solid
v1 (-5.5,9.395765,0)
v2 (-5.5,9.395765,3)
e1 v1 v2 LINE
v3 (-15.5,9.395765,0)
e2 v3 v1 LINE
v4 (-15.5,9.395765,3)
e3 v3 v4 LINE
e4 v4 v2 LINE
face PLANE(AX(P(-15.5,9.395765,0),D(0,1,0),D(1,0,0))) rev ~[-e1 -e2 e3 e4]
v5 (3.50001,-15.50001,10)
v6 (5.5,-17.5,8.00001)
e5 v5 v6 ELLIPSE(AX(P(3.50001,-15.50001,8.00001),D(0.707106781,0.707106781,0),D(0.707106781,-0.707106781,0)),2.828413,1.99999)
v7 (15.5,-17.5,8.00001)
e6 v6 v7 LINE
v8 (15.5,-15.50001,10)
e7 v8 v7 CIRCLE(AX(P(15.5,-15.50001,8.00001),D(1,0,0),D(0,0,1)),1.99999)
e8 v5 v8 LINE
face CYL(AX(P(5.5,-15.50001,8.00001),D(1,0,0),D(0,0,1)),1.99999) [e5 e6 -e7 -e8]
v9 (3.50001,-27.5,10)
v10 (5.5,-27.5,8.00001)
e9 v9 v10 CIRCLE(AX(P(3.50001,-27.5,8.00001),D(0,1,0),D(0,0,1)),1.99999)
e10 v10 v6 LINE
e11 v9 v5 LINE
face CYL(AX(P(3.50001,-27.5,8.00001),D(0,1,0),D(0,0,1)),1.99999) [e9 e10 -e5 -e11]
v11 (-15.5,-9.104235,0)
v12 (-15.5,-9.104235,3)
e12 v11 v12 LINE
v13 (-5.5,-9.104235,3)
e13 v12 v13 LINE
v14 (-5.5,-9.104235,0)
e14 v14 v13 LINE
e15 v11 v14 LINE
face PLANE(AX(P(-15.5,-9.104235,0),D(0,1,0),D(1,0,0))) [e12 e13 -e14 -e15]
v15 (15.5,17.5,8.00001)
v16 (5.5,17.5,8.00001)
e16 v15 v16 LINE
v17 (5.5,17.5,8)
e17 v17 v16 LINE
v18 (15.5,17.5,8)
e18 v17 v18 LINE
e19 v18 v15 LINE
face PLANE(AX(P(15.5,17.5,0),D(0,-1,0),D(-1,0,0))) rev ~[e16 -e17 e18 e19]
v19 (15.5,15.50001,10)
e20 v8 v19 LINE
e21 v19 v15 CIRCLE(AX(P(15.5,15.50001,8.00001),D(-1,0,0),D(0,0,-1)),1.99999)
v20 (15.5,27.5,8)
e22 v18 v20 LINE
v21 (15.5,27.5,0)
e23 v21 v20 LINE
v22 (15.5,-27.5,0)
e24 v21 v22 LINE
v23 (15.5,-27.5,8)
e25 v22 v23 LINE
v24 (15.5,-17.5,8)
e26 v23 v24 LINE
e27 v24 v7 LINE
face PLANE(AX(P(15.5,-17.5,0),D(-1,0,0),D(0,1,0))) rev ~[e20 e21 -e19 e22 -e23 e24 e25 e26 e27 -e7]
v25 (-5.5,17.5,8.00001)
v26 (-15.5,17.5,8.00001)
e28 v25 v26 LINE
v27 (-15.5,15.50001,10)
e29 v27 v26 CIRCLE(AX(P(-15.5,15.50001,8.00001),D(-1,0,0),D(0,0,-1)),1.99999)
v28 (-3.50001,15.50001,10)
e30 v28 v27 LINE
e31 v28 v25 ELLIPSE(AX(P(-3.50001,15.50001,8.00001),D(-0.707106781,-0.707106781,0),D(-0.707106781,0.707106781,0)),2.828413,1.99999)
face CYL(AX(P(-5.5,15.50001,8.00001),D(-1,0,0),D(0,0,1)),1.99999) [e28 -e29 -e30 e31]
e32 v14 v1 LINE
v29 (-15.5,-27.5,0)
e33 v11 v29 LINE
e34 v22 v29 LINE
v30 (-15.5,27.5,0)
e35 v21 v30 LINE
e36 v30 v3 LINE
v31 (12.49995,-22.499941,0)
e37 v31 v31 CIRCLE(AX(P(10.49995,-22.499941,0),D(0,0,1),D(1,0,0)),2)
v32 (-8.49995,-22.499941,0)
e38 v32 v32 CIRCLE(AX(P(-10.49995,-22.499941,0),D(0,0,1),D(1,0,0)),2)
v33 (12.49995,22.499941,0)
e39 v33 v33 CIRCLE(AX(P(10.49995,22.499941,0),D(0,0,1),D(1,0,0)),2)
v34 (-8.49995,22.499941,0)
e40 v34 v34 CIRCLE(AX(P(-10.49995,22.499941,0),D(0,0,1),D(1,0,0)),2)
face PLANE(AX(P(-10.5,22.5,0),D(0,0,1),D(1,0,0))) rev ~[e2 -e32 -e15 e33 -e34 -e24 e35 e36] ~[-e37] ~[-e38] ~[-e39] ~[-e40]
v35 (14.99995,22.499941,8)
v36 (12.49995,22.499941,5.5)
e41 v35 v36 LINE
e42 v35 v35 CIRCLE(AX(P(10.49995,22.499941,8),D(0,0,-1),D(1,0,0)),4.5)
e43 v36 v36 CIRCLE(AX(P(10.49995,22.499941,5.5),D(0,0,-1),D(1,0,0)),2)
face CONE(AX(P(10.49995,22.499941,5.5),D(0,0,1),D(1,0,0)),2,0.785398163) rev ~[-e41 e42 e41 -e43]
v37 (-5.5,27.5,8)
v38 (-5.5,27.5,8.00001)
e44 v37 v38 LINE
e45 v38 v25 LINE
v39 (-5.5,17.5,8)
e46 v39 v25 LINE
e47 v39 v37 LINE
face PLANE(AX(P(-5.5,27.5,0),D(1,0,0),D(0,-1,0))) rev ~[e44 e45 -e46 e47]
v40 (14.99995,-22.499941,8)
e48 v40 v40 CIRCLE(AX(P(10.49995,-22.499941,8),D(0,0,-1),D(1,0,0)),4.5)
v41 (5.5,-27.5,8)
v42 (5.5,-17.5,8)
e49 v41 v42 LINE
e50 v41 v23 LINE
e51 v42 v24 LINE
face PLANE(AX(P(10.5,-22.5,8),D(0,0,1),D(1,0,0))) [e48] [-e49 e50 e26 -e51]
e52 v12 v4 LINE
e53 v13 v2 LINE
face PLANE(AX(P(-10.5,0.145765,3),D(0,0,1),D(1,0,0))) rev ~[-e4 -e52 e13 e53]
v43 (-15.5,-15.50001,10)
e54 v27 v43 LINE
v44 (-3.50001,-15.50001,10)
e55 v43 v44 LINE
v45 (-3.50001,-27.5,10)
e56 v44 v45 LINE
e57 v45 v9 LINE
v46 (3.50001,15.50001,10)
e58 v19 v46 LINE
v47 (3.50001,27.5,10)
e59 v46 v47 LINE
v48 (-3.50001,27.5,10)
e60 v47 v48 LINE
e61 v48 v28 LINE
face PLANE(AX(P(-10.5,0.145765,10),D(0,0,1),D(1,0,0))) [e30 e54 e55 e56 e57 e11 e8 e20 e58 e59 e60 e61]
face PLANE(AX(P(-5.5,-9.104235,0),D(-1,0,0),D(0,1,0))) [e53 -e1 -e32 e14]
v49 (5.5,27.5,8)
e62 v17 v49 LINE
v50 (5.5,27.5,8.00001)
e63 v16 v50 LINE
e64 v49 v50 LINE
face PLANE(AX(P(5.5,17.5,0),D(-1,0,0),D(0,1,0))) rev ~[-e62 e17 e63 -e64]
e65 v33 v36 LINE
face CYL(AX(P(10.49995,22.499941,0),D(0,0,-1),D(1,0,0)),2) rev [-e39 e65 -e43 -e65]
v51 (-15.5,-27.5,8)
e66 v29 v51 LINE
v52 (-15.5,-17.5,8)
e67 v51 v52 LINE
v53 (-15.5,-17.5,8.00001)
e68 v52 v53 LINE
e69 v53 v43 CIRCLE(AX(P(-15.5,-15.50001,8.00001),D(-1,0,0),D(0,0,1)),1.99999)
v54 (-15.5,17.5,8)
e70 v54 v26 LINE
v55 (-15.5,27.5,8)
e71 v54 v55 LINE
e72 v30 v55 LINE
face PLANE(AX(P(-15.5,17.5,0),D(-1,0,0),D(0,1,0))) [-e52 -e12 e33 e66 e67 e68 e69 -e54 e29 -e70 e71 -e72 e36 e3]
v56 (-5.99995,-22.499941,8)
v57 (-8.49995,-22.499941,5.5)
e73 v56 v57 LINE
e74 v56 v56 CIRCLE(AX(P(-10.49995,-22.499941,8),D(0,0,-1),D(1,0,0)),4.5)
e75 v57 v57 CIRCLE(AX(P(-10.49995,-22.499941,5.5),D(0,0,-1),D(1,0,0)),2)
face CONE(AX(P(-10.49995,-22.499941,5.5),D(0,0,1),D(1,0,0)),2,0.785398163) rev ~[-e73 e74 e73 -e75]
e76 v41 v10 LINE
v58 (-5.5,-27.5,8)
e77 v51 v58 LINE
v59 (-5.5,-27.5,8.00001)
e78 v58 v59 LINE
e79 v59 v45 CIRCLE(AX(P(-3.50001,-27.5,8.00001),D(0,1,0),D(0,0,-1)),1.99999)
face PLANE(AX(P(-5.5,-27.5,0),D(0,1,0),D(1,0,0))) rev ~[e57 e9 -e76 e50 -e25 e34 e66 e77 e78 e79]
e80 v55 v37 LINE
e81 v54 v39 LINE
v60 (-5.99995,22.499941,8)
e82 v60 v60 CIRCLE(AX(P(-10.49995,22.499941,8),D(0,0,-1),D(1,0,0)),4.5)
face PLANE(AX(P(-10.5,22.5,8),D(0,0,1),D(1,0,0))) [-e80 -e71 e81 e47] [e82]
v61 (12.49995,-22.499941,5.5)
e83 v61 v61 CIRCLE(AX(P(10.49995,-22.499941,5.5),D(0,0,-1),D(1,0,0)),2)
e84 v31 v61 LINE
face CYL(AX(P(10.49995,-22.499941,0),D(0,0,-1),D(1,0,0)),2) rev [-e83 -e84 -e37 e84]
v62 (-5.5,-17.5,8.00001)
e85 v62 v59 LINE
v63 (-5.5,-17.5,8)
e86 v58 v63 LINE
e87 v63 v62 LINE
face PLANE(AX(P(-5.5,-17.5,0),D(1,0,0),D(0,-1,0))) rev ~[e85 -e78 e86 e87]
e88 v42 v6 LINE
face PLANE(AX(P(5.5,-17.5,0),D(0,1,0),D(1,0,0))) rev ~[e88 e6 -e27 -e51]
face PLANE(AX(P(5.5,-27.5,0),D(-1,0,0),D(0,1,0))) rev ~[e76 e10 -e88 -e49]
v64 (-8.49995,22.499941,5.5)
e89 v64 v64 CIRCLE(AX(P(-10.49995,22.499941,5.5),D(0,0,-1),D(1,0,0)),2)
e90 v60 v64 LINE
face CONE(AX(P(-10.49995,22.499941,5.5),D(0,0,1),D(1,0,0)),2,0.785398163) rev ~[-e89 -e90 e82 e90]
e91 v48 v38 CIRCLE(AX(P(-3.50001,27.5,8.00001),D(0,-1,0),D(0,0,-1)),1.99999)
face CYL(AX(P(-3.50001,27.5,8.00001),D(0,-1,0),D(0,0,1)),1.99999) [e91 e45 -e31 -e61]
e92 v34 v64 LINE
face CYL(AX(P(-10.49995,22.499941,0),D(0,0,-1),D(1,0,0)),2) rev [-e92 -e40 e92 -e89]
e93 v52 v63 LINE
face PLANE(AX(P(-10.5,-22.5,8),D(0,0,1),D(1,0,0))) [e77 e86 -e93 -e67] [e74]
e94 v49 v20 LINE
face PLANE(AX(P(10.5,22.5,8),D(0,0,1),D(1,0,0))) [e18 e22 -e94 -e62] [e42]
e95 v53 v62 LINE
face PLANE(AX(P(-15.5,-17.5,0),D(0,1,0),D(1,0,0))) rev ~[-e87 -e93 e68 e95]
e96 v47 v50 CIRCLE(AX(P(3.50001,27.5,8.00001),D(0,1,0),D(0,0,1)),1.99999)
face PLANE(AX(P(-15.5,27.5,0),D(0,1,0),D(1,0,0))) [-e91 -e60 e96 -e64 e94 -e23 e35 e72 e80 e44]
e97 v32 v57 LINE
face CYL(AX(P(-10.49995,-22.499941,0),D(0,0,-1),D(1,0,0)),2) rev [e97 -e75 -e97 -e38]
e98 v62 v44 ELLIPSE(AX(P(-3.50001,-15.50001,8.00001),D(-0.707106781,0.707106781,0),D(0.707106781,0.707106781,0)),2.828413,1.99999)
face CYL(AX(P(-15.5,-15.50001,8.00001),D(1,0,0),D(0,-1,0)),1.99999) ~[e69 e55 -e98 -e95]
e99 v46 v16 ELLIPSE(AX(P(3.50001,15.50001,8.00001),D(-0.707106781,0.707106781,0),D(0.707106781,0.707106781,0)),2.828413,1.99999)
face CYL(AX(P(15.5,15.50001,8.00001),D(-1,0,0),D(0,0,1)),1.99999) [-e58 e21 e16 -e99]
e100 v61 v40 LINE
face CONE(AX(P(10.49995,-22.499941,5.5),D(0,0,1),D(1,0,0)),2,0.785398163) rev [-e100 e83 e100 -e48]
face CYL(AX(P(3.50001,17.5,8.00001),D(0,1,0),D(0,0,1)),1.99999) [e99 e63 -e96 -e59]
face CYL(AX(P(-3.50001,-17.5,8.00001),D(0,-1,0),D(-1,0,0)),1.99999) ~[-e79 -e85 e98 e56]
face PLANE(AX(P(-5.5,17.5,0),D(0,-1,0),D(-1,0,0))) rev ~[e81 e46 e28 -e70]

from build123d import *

# Parameters (mm, degrees)
F0_W     = 10
F0_H     = 18.5
F2_DEPTH = 10
F3_DEPTH = 3
F0_H_2   = 10
F4_DEPTH = 8
F1_R     = 2
F5_DEPTH = 25
F6_SIZE  = 2.5
F7_R     = 1.99999


# Not quite as in the source:
# - a fillet or chamfer is up to 0.001 mm smaller than in the source, because OpenCascade refuses the exact size


with BuildPart() as f2:
    # F0 (on Top) → F2 (new body)
    with BuildSketch(Plane.XY):
        with Locations((-10.5, 0.1457649022)):
            Rectangle(F0_W, F0_H)
        Polygon((5.5, 17.5), (5.5, 27.5), (-5.5, 27.5), (-5.5, 17.5), (-15.5, 17.5), (-15.5, 9.3957649022), (-5.5, 9.3957649022), (-5.5, -9.1042350978), (-15.5, -9.1042350978), (-15.5, -17.5), (-5.5, -17.5), (-5.5, -27.5), (5.5, -27.5), (5.5, -17.5), (15.5, -17.5), (15.5, 17.5), align=None)
    extrude(amount=F2_DEPTH)

    # F0 (on Top) → F3 (cut)
    with BuildSketch(Plane.XY):
        with Locations((-10.5, 0.1457649022)):
            Rectangle(F0_W, F0_H)
    extrude(amount=F3_DEPTH, mode=Mode.SUBTRACT)

    # F0 (on Top) → F4 (join)
    with BuildSketch(Plane.XY):
        with Locations((-10.5, 22.5)):
            Rectangle(F0_W, F0_H_2)
        with Locations((10.5, 22.5)):
            Rectangle(F0_W, F0_H_2)
        with Locations((-10.5, -22.5)):
            Rectangle(F0_W, F0_H_2)
        with Locations((10.5, -22.5)):
            Rectangle(F0_W, F0_H_2)
    extrude(amount=F4_DEPTH)

    # F1 (on Top) → F5 (cut)
    with BuildSketch(Plane.XY):
        with Locations((-10.4999503866, 22.4999412894)):
            Circle(F1_R)
        with Locations((10.4999503866, 22.4999412894)):
            Circle(F1_R)
        with Locations((-10.4999503866, -22.4999412894)):
            Circle(F1_R)
        with Locations((10.4999503866, -22.4999412894)):
            Circle(F1_R)
    extrude(amount=F5_DEPTH, mode=Mode.SUBTRACT)

    # F6
    f6_edges = [f2.edges().sort_by_distance(p)[0] for p in [
        (-12.49995, 22.499941, 8),
        (8.49995, 22.499941, 8),
        (8.49995, -22.499941, 8),
        (-12.49995, -22.499941, 8),
    ]]
    chamfer(f6_edges, length=F6_SIZE)

    # F7 (radius 2 in the source; OpenCascade refuses exactly that, so slightly less here)
    f7_edges = [f2.edges().sort_by_distance(p)[0] for p in [
        (-10.5, -17.5, 10),
        (-5.5, -22.5, 10),
        (-10.5, 17.5, 10),
        (-5.5, 22.5, 10),
        (5.5, 22.5, 10),
        (10.5, 17.5, 10),
        (10.5, -17.5, 10),
        (5.5, -22.5, 10),
    ]]
    fillet(f7_edges, radius=F7_R)


solid = f2.part
